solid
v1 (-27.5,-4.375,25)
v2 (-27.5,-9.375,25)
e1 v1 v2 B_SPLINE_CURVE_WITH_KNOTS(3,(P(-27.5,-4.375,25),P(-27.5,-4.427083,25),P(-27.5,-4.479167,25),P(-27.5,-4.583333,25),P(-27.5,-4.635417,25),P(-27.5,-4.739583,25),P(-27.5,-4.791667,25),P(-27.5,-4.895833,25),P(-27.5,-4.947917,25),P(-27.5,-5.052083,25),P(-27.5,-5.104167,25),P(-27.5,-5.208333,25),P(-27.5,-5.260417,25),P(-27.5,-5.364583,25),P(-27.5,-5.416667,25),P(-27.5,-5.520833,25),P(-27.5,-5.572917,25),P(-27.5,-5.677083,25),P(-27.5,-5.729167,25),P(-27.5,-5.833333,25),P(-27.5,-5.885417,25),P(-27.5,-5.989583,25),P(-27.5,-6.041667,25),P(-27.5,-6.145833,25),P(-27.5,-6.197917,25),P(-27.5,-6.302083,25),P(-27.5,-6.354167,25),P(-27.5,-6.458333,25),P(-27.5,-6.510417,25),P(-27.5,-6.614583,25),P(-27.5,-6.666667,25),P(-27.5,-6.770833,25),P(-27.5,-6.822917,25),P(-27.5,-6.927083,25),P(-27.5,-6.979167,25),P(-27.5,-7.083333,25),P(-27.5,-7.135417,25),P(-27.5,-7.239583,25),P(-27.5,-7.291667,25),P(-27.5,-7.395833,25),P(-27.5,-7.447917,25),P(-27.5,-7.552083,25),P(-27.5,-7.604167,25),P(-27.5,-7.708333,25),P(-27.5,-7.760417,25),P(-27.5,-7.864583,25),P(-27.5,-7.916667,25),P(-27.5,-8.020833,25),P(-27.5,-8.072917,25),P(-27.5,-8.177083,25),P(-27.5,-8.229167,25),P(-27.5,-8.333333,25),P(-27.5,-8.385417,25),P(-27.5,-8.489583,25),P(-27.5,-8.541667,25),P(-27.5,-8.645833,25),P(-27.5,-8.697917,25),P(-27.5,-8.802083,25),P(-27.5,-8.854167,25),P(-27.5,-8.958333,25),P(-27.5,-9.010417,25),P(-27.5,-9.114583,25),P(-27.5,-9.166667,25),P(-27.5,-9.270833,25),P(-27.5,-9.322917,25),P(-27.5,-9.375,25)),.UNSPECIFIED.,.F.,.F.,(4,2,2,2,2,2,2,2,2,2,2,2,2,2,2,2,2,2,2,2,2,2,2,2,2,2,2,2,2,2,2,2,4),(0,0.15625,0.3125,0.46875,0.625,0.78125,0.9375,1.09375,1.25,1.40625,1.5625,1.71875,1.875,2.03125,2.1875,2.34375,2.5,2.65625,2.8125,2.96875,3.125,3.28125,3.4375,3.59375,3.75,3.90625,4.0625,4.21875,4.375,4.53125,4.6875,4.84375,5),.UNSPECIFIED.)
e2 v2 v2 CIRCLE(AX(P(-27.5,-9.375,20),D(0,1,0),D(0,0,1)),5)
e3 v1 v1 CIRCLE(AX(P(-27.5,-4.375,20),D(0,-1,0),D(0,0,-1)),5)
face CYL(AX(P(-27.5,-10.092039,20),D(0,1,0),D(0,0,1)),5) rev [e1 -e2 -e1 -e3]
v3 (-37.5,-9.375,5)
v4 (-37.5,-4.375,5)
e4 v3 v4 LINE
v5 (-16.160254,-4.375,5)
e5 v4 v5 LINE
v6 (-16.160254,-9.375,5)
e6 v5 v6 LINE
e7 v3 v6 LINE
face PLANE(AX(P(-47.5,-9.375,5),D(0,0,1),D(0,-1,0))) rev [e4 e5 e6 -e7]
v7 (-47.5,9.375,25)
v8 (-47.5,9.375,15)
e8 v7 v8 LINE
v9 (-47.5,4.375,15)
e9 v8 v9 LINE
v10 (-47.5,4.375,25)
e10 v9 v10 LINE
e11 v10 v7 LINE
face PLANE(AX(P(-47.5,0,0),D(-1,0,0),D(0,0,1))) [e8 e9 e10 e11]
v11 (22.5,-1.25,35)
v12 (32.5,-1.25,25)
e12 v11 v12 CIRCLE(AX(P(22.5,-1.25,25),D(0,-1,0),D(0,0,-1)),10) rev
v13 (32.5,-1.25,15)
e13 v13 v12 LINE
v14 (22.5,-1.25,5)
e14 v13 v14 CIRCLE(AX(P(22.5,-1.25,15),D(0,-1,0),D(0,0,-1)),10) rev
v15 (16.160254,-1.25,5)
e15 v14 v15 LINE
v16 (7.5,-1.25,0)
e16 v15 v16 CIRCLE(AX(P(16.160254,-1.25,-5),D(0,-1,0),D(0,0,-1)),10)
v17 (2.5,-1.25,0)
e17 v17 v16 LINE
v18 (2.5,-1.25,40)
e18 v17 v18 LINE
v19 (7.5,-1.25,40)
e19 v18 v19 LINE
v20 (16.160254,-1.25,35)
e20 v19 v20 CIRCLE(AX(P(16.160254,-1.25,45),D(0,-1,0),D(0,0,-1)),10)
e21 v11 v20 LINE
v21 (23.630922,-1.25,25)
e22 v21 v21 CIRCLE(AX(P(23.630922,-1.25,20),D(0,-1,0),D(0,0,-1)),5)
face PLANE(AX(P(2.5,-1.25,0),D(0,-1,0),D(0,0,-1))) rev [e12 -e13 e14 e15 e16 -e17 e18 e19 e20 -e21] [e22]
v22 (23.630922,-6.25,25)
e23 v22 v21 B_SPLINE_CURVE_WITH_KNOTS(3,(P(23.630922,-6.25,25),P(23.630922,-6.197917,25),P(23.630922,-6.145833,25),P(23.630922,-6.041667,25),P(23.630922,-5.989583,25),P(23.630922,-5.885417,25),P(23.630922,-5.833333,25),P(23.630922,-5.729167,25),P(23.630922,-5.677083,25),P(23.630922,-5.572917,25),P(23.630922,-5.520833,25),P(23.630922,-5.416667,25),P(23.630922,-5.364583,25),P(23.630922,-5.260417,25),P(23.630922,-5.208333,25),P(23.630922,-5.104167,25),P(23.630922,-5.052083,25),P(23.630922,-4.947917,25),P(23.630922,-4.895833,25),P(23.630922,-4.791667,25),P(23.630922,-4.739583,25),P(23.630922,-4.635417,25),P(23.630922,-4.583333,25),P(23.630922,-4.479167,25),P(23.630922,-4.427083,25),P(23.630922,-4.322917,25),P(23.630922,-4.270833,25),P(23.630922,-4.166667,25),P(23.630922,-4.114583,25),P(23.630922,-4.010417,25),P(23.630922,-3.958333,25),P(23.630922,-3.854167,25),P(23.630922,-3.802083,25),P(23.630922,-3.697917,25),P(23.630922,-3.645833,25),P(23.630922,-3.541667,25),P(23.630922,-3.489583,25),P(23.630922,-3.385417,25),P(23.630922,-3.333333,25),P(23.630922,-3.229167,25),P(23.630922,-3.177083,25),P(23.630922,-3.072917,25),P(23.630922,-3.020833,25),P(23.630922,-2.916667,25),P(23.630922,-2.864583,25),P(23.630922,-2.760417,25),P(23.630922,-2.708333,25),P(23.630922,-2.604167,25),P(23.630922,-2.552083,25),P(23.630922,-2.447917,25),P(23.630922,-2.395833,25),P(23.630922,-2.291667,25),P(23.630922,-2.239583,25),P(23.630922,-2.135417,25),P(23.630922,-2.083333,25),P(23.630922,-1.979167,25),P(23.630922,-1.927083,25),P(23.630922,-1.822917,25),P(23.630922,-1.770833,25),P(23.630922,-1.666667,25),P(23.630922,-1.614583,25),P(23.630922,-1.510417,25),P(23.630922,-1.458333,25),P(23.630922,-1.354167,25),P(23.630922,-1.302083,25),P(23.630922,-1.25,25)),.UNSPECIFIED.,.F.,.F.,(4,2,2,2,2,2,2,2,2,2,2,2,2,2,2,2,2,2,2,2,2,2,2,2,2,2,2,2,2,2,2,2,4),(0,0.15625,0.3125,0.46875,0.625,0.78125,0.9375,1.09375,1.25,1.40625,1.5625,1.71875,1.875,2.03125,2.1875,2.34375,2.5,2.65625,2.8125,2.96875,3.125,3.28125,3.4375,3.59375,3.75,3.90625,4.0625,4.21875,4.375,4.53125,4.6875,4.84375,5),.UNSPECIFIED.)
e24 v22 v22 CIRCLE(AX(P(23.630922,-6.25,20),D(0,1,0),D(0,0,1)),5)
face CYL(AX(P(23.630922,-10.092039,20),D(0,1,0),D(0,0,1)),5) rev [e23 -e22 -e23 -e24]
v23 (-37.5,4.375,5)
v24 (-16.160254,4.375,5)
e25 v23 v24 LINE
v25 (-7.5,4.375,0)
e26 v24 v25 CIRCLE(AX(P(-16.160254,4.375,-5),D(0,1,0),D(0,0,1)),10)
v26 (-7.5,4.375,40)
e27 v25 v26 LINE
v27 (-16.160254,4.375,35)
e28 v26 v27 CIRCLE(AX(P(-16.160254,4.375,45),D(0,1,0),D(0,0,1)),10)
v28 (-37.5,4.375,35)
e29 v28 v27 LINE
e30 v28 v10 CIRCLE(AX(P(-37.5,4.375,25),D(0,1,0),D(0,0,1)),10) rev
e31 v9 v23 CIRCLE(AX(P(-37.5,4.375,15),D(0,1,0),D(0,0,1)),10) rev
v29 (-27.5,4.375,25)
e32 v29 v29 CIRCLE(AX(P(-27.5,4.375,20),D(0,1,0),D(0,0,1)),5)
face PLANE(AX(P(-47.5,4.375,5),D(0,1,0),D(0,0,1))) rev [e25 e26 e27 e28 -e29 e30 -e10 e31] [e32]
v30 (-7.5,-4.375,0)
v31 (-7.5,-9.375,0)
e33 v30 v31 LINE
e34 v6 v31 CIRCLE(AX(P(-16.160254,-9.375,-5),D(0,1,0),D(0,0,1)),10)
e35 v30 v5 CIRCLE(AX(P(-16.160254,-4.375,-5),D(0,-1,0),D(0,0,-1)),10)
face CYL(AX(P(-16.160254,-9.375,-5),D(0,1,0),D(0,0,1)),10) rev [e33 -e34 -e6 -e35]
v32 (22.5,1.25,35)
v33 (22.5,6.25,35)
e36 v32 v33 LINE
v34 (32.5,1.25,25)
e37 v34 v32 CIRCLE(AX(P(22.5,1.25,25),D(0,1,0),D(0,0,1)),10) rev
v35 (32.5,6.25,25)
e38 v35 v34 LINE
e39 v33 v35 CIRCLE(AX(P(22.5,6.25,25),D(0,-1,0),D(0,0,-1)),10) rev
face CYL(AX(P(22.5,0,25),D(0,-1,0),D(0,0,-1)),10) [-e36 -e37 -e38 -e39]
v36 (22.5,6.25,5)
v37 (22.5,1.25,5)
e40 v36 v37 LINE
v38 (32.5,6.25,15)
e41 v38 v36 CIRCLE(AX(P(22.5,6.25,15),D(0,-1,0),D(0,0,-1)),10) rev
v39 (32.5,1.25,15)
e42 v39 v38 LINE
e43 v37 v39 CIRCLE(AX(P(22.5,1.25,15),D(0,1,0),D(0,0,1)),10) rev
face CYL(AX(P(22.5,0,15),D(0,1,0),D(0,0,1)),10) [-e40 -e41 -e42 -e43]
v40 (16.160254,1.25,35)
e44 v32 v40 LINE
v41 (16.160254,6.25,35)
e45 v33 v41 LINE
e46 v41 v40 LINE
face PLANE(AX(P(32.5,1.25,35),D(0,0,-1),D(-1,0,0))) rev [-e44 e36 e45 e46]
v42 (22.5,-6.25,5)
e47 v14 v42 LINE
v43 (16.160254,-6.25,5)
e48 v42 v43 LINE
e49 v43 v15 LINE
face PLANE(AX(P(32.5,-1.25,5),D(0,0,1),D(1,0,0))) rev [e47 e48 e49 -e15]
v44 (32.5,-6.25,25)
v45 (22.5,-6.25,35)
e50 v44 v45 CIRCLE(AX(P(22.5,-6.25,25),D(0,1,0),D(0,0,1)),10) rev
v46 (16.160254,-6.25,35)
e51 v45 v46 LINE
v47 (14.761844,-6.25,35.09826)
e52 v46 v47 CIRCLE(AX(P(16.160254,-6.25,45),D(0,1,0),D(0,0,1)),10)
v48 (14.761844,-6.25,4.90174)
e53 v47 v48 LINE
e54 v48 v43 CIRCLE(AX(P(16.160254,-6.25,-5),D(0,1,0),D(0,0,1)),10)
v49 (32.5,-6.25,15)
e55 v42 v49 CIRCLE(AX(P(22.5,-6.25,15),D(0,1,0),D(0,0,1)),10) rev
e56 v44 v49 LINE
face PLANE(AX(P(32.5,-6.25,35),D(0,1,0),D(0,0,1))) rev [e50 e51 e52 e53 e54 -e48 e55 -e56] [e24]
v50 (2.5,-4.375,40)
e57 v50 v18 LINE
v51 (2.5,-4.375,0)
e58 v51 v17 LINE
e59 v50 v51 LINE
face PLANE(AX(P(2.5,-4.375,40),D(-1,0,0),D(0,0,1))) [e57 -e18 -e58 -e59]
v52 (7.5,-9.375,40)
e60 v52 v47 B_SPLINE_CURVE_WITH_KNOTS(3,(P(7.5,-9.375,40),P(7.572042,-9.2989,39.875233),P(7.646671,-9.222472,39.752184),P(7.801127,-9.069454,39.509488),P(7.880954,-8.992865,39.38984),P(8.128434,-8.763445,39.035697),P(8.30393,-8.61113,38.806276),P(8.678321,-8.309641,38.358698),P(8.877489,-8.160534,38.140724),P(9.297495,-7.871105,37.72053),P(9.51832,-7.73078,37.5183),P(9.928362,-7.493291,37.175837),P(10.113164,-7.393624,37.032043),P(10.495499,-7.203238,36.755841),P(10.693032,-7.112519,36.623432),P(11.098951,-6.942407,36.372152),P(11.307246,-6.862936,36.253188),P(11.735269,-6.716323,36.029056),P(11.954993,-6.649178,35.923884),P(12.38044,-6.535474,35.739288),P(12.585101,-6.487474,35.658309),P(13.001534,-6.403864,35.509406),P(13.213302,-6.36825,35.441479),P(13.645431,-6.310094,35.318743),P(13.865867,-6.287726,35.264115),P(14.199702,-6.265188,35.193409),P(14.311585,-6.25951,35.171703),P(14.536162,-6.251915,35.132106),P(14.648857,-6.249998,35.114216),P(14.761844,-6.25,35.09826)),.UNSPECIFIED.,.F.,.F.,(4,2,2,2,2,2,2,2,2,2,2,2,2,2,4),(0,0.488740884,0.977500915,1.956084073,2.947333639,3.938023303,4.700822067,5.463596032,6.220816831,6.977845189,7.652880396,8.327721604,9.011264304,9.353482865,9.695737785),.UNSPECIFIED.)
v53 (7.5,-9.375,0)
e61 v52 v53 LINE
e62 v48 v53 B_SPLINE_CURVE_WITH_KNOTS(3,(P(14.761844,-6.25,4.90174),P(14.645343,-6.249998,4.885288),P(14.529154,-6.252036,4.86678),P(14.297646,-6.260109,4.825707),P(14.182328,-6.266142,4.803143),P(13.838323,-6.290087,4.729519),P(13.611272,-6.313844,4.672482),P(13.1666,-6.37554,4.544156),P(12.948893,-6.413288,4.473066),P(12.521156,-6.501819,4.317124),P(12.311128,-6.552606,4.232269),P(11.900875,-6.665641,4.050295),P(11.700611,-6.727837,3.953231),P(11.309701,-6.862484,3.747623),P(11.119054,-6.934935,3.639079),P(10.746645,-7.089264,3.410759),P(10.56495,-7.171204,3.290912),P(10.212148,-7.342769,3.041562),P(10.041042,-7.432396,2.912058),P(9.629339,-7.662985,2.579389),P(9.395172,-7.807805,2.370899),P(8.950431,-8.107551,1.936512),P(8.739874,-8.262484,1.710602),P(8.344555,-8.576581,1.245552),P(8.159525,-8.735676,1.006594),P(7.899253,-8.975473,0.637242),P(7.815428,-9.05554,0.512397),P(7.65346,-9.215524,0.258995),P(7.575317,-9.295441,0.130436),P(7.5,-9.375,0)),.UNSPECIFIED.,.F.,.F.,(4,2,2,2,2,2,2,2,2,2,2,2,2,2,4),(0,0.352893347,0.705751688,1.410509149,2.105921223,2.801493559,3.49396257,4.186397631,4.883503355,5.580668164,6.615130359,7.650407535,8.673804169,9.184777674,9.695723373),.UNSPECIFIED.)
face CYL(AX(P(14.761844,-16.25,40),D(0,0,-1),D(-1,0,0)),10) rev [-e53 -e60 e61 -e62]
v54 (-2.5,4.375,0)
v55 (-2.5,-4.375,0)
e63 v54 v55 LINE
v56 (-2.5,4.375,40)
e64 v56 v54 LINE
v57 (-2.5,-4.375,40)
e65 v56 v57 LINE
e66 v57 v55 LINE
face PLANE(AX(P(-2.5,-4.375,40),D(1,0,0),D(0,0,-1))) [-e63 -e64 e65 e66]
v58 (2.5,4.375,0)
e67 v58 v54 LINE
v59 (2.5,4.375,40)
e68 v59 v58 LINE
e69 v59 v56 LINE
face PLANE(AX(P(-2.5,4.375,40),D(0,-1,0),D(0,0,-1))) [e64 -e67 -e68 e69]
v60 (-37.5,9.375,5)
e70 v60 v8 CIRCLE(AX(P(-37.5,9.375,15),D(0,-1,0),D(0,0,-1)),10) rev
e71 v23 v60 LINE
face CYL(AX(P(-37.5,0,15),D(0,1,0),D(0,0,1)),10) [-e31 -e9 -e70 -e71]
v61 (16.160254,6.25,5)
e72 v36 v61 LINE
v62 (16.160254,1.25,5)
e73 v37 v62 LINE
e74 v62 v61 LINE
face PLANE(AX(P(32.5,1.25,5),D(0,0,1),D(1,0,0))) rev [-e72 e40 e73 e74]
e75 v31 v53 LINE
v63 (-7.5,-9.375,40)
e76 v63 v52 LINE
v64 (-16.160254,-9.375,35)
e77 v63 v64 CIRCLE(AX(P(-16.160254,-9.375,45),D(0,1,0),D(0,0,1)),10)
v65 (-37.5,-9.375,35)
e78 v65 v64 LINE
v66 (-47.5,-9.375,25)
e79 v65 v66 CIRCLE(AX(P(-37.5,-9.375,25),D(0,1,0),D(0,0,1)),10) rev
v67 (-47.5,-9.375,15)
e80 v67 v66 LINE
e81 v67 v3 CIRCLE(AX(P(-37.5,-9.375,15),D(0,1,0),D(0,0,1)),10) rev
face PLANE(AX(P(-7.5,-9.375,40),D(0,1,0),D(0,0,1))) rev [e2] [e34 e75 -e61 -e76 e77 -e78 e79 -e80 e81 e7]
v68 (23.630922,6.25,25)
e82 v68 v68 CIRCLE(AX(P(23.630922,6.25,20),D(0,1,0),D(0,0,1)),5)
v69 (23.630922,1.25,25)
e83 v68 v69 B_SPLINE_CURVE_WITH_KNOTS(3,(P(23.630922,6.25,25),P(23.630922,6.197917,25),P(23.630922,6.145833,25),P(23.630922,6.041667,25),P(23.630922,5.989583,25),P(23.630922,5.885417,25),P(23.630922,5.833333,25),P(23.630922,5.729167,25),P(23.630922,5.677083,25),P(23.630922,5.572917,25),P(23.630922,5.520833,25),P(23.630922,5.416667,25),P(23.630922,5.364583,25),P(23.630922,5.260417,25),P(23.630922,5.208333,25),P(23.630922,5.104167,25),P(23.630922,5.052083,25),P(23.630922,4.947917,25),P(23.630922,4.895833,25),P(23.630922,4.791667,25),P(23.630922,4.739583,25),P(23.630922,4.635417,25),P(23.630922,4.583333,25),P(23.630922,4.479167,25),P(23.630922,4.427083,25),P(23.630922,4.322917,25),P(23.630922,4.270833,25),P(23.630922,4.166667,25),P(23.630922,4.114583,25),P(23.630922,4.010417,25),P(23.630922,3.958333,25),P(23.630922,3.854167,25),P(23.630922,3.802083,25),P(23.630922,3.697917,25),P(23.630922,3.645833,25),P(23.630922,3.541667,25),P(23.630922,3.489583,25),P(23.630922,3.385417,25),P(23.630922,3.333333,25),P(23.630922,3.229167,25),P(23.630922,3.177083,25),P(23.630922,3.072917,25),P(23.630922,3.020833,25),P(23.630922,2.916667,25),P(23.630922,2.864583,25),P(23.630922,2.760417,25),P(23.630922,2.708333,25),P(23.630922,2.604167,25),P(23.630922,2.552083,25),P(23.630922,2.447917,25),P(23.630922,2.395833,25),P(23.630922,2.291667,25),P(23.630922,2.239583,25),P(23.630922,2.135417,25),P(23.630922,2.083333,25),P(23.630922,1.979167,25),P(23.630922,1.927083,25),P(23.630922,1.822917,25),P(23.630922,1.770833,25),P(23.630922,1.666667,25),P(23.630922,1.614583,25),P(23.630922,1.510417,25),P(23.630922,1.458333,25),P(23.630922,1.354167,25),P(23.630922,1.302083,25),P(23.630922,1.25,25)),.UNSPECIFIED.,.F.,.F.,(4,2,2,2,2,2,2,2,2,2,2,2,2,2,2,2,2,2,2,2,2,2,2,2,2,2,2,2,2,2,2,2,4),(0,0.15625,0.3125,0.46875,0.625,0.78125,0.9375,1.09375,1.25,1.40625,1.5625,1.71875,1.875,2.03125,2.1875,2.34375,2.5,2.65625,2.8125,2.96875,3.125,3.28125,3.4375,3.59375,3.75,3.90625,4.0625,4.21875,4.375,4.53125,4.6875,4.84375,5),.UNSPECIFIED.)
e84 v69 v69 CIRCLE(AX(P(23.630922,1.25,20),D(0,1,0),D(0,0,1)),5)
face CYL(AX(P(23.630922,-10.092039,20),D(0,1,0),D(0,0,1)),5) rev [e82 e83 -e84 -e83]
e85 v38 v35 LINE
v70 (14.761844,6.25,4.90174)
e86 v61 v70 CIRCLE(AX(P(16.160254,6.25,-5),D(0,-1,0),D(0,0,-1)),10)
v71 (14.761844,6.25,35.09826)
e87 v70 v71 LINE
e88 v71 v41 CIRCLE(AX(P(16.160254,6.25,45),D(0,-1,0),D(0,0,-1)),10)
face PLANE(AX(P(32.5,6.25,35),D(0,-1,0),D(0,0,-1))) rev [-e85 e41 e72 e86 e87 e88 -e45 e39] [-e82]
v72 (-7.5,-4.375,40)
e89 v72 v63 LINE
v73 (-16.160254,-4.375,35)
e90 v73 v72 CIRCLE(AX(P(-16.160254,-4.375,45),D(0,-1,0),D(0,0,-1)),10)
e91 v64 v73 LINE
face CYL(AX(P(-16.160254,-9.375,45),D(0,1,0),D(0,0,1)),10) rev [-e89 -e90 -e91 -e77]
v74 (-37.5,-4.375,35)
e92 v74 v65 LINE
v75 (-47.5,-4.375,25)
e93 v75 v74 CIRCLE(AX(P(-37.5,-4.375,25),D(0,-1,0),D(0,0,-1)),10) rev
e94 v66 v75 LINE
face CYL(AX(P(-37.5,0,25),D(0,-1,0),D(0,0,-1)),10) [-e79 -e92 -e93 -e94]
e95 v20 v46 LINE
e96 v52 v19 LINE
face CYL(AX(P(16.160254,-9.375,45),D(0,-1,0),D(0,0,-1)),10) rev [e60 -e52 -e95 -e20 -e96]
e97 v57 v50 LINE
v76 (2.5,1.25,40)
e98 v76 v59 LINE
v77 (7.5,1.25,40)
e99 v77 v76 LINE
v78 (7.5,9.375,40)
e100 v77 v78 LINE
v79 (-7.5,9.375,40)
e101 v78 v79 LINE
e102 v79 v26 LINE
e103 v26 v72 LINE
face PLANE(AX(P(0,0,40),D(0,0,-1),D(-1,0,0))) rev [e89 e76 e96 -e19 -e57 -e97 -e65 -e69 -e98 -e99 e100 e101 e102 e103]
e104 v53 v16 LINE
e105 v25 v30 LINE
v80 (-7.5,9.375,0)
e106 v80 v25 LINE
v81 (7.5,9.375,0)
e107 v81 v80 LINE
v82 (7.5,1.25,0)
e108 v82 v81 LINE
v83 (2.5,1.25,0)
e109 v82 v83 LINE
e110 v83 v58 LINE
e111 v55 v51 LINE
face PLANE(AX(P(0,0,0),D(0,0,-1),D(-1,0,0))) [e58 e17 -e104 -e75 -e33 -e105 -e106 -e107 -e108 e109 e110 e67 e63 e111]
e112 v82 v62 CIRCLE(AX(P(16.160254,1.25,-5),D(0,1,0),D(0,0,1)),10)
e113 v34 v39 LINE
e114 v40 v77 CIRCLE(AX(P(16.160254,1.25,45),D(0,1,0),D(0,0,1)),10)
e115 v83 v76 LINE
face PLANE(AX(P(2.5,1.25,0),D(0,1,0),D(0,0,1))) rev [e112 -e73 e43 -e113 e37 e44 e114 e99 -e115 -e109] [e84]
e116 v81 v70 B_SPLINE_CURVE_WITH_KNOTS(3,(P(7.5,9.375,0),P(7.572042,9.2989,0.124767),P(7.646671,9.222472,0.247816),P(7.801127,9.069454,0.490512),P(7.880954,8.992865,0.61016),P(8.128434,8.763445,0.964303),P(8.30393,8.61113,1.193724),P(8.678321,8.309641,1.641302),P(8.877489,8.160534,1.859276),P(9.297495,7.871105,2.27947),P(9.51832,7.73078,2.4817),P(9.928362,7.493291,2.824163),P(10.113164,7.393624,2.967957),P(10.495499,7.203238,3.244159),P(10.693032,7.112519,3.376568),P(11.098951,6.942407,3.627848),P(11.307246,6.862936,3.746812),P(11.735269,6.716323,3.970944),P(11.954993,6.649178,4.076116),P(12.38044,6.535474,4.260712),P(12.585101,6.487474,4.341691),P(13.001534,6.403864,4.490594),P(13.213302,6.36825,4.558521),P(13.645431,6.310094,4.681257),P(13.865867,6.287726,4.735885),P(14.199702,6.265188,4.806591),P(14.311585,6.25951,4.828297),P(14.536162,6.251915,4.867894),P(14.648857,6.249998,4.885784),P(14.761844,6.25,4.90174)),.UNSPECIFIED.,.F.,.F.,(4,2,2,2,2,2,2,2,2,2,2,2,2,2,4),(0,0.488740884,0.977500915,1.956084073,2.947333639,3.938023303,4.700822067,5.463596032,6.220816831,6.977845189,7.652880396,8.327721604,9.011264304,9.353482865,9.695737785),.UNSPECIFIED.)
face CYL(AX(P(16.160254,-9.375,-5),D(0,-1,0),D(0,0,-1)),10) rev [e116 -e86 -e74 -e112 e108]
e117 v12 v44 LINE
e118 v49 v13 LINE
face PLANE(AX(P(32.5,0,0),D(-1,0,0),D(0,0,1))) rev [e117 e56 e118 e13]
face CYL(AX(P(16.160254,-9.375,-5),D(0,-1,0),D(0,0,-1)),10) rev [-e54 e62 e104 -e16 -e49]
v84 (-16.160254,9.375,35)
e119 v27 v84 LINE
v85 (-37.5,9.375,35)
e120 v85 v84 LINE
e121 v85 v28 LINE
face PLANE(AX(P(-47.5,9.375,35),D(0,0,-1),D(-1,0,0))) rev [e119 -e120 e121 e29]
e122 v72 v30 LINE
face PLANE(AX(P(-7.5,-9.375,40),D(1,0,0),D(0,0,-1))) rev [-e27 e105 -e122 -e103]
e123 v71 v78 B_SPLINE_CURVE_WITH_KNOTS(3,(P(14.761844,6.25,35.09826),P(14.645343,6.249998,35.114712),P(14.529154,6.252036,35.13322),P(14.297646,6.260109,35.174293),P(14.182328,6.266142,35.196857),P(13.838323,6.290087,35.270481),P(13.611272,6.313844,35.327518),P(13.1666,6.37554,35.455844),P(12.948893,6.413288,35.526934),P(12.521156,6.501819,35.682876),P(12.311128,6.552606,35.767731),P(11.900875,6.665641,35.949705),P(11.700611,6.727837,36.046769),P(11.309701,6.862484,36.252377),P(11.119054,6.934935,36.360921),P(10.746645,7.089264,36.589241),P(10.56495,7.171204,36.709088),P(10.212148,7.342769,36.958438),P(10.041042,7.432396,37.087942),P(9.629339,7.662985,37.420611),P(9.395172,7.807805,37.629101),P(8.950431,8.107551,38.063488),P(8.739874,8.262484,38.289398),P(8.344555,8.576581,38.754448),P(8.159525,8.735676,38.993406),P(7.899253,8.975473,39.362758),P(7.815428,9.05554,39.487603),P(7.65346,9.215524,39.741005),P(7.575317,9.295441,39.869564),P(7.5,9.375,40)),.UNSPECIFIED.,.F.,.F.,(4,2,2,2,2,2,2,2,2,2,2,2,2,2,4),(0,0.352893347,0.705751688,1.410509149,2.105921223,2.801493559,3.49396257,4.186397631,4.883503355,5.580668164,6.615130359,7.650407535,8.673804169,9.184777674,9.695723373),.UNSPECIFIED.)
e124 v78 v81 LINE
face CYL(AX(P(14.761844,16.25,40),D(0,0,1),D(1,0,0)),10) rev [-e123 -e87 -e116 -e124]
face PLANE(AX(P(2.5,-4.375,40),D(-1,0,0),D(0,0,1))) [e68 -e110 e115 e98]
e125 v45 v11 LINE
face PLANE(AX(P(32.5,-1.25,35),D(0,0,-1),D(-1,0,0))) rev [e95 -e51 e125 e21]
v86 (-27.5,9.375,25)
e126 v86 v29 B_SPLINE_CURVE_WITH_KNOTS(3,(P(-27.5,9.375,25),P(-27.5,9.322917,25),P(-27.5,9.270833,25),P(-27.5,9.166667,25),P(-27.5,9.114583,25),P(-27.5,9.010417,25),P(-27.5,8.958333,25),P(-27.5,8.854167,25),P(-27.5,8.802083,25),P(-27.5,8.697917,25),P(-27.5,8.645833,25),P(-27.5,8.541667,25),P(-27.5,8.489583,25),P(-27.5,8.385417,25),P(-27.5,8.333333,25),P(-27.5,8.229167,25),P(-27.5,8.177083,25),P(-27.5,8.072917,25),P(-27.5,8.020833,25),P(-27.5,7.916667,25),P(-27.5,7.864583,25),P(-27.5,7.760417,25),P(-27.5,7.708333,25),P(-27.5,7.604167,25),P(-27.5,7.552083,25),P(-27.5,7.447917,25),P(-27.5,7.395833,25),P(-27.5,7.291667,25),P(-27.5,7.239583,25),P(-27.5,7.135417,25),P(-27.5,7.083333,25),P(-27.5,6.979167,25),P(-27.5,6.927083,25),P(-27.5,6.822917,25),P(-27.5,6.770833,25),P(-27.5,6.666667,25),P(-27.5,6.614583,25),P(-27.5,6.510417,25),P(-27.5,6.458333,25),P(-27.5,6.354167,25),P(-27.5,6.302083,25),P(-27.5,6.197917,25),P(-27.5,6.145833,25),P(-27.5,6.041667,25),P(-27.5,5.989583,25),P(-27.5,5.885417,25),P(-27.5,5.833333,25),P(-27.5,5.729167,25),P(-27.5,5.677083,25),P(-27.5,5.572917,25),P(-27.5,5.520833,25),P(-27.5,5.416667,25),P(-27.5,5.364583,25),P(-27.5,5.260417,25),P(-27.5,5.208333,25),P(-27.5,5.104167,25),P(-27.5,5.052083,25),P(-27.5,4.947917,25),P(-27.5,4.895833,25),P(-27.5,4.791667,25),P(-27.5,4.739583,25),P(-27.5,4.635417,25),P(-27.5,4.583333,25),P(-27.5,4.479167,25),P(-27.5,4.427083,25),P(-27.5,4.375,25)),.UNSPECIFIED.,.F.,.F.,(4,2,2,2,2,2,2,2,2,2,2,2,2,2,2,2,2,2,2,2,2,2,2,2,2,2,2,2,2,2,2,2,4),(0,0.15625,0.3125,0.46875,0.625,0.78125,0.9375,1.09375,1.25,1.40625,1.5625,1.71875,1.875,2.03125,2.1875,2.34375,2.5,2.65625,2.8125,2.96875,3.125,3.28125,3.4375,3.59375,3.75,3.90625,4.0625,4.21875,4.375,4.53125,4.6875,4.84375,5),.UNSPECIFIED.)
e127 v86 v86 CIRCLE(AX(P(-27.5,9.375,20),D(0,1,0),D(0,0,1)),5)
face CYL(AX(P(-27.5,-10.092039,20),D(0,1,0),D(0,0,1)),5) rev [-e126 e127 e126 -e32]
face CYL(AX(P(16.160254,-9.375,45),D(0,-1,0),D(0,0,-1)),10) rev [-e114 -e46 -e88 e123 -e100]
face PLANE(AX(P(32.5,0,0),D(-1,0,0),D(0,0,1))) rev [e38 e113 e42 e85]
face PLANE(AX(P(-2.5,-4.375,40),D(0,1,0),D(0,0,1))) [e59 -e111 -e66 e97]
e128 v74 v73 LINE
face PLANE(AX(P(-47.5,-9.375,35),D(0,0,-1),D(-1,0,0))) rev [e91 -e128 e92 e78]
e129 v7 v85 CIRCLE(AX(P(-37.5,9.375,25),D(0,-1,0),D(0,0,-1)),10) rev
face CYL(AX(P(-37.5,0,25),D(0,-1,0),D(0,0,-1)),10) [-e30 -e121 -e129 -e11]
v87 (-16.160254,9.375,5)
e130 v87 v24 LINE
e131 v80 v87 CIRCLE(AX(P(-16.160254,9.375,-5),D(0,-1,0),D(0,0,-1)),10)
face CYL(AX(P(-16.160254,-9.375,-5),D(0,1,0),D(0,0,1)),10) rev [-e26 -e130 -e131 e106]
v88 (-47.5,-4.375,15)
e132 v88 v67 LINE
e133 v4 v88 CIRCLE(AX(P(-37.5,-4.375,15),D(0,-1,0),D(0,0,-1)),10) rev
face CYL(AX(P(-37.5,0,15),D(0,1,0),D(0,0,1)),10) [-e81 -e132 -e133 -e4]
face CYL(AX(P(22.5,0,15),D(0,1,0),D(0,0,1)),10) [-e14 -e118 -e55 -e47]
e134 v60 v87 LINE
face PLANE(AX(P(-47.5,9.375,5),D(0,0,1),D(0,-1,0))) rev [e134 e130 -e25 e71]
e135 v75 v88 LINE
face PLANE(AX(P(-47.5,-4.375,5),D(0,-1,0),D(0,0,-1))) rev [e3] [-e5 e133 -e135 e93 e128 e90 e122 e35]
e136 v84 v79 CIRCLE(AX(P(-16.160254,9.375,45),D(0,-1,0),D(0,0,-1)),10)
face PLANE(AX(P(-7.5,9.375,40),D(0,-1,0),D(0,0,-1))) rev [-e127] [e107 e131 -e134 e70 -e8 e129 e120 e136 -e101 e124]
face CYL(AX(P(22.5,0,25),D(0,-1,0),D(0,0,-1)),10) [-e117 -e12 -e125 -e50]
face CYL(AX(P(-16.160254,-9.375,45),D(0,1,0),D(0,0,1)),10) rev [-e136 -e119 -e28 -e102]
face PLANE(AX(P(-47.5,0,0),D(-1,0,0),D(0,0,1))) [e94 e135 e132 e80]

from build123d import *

# Parameters (mm, degrees)
SCHIZZO1_W                    = 15
SCHIZZO1_H                    = 18.75
SCHIZZO1_W_2                  = 5
SCHIZZO1_H_2                  = 8.75
ESTRUSIONE_ESTRUSIONE1_DEPTH  = 40
TAGLIO_ESTRUSIONE1_DEPTH      = 42.762909681
TAGLIO_ESTRUSIONE1_DEPTH_BACK = 42.762909681
SCHIZZO2_W                    = 5
SCHIZZO2_H                    = 2.5
SCHIZZO4_W                    = 30
SCHIZZO4_H                    = 5
ESTRUSIONE_ESTRUSIONE2_DEPTH  = 40
RACCORDO1_R                   = 10
SCHIZZO5_W                    = 30
SCHIZZO5_H                    = 5
ESTRUSIONE_ESTRUSIONE3_DEPTH  = 25
RACCORDO2_R                   = 10
RACCORDO3_R                   = 10
RACCORDO4_R                   = 10
RACCORDO5_R                   = 10
TAGLIO_ESTRUSIONE2_DEPTH      = 65.034292657
TAGLIO_ESTRUSIONE2_DEPTH_BACK = 65.034292657
SCHIZZO6_R                    = 5
TAGLIO_ESTRUSIONE3_DEPTH      = 65.867653817
TAGLIO_ESTRUSIONE3_DEPTH_BACK = 65.867653817
SCHIZZO7_R                    = 5


with BuildPart() as part:
    # Schizzo1 → Estrusione-Estrusione1 (new body)
    with BuildSketch(Plane.XY):
        Rectangle(SCHIZZO1_W, SCHIZZO1_H)
        Rectangle(SCHIZZO1_W_2, SCHIZZO1_H_2, mode=Mode.SUBTRACT)
    extrude(amount=ESTRUSIONE_ESTRUSIONE1_DEPTH)

    # Schizzo2 → Taglio-Estrusione1 (cut, two sides: drawn at the far end of the back side and taken through both)
    with BuildSketch(Plane.XY.offset(40).offset(-TAGLIO_ESTRUSIONE1_DEPTH_BACK)):
        with Locations((5, 0)):
            Rectangle(SCHIZZO2_W, SCHIZZO2_H)
    extrude(amount=TAGLIO_ESTRUSIONE1_DEPTH + TAGLIO_ESTRUSIONE1_DEPTH_BACK, mode=Mode.SUBTRACT)

    # Schizzo4 → Estrusione-Estrusione2 (add)
    with BuildSketch(Plane.ZY.offset(7.5)):
        with Locations((20, 6.875)):
            Rectangle(SCHIZZO4_W, SCHIZZO4_H)
        with Locations((20, -6.875)):
            Rectangle(SCHIZZO4_W, SCHIZZO4_H)
    extrude(amount=ESTRUSIONE_ESTRUSIONE2_DEPTH)

    # Raccordo1
    raccordo1_edges = [part.edges().sort_by_distance(p)[0] for p in [
        (-47.5, 6.875, 5),
        (-47.5, 6.875, 35),
        (-47.5, -6.875, 35),
        (-47.5, -6.875, 5),
    ]]
    fillet(raccordo1_edges, radius=RACCORDO1_R)

    # Schizzo5 → Estrusione-Estrusione3 (add)
    with BuildSketch(Plane(origin=(7.5, 0, 0), x_dir=(0, 0, -1), z_dir=(1, 0, 0))):
        with Locations((-20, 3.75)):
            Rectangle(SCHIZZO5_W, SCHIZZO5_H)
        with Locations((-20, -3.75)):
            Rectangle(SCHIZZO5_W, SCHIZZO5_H)
    extrude(amount=ESTRUSIONE_ESTRUSIONE3_DEPTH)

    # Raccordo2
    raccordo2_edges = [part.edges().sort_by_distance(p)[0] for p in [
        (32.5, 3.75, 35),
        (32.5, 3.75, 5),
        (32.5, -3.75, 35),
        (32.5, -3.75, 5),
    ]]
    fillet(raccordo2_edges, radius=RACCORDO2_R)

    # Raccordo3
    # the kernel refuses this fillet: 10 mm, written as the material it adds along each edge
    with BuildSketch(Plane(origin=(7.5, -6.25, 5), x_dir=(0, 0, -1), z_dir=(0, 1, 0)), Plane(origin=(7.5, 1.25, 5), x_dir=(0, 0, -1), z_dir=(0, 1, 0)), Plane(origin=(7.5, 6.25, 35), x_dir=(0, 0, 1), z_dir=(0, -1, 0))) as raccordo3_piece_1:
        with BuildLine():
            CenterArc((10, -8.660254038), RACCORDO3_R, 120, 60)
            Line((0, -8.660254038), (-0.2, -8.660254038))
            Line((-0.2, -8.660254038), (-0.2, 0))
            Line((-0.2, 0), (0, 0.2))
            ThreePointArc((0, 0.2), (2.5, 0.2), (4.9, 0.173205081))
            Line((4.9, 0.173205081), (5, 0))
        make_face()
    extrude(amount=5)
    with BuildSketch(Plane(origin=(7.5, -6.25, 5), x_dir=(0, 0, -1), z_dir=(0, 1, 0))) as raccordo3_piece_2_section:
        with BuildLine():
            CenterArc((10, -8.660254038), RACCORDO3_R, 120, 60)
            Line((0, -8.660254038), (-0.2, -8.660254038))
            Line((-0.2, -8.660254038), (-0.2, 0))
            Line((-0.2, 0), (0, 0.2))
            ThreePointArc((0, 0.2), (2.5, 0.2), (4.9, 0.173205081))
            Line((4.9, 0.173205081), (5, 0))
        make_face()
    raccordo3_piece_2 = extrude(amount=26.650635095, mode=Mode.PRIVATE)
    raccordo3_piece_2 = split(raccordo3_piece_2, bisect_by=Plane(origin=(9.663104458, 1.25, 3.704832889), z_dir=(0, 1, 0)), keep=Keep.TOP, mode=Mode.PRIVATE)
    raccordo3_piece_2 = split(raccordo3_piece_2, bisect_by=Plane(origin=(9.663104458, 6.25, 3.704832889), z_dir=(0, -1, 0)), keep=Keep.TOP, mode=Mode.PRIVATE)
    add(raccordo3_piece_2)
    with BuildSketch(Plane(origin=(7.5, -20.400635095, 5), x_dir=(0, 0, -1), z_dir=(0, 1, 0))) as raccordo3_piece_3_section:
        with BuildLine():
            CenterArc((10, -8.660254038), RACCORDO3_R, 120, 60)
            Line((0, -8.660254038), (-0.2, -8.660254038))
            Line((-0.2, -8.660254038), (-0.2, 0))
            Line((-0.2, 0), (0, 0.2))
            ThreePointArc((0, 0.2), (2.5, 0.2), (4.9, 0.173205081))
            Line((4.9, 0.173205081), (5, 0))
        make_face()
    raccordo3_piece_3 = extrude(amount=26.650635095, mode=Mode.PRIVATE)
    raccordo3_piece_3 = split(raccordo3_piece_3, bisect_by=Plane(origin=(9.663104458, -1.25, 3.704832889), z_dir=(0, -1, 0)), keep=Keep.TOP, mode=Mode.PRIVATE)
    raccordo3_piece_3 = split(raccordo3_piece_3, bisect_by=Plane(origin=(9.663104458, -6.25, 3.704832889), z_dir=(0, 1, 0)), keep=Keep.TOP, mode=Mode.PRIVATE)
    add(raccordo3_piece_3)
    with BuildSketch(Plane(origin=(7.5, 20.400635095, 35), x_dir=(1, 0, 0), z_dir=(0, -1, 0))) as raccordo3_piece_4_section:
        with BuildLine():
            CenterArc((8.660254038, 10), RACCORDO3_R, 210, 60)
            Line((0, 5), (-0.173205081, 4.9))
            ThreePointArc((-0.173205081, 4.9), (-0.2, 2.5), (-0.2, 0))
            Line((-0.2, 0), (0, -0.2))
            Line((0, -0.2), (8.660254038, -0.2))
            Line((8.660254038, -0.2), (8.660254038, 0))
        make_face()
    raccordo3_piece_4 = extrude(amount=26.650635095, mode=Mode.PRIVATE)
    raccordo3_piece_4 = split(raccordo3_piece_4, bisect_by=Plane(origin=(9.663104458, 1.25, 36.295167111), z_dir=(0, 1, 0)), keep=Keep.TOP, mode=Mode.PRIVATE)
    raccordo3_piece_4 = split(raccordo3_piece_4, bisect_by=Plane(origin=(9.663104458, 6.25, 36.295167111), z_dir=(0, -1, 0)), keep=Keep.TOP, mode=Mode.PRIVATE)
    add(raccordo3_piece_4)
    with BuildSketch(Plane(origin=(7.5, -1.25, 35), x_dir=(1, 0, 0), z_dir=(0, -1, 0))) as raccordo3_piece_5:
        with BuildLine():
            CenterArc((8.660254038, 10), RACCORDO3_R, 210, 60)
            Line((0, 5), (-0.173205081, 4.9))
            ThreePointArc((-0.173205081, 4.9), (-0.2, 2.5), (-0.2, 0))
            Line((-0.2, 0), (0, -0.2))
            Line((0, -0.2), (8.660254038, -0.2))
            Line((8.660254038, -0.2), (8.660254038, 0))
        make_face()
    extrude(amount=5)
    with BuildSketch(Plane(origin=(7.5, 6.25, 35), x_dir=(0, 0, 1), z_dir=(0, -1, 0))) as raccordo3_piece_6_section:
        with BuildLine():
            CenterArc((10, -8.660254038), RACCORDO3_R, 120, 60)
            Line((0, -8.660254038), (-0.2, -8.660254038))
            Line((-0.2, -8.660254038), (-0.2, 0))
            Line((-0.2, 0), (0, 0.2))
            ThreePointArc((0, 0.2), (2.5, 0.2), (4.9, 0.173205081))
            Line((4.9, 0.173205081), (5, 0))
        make_face()
    raccordo3_piece_6 = extrude(amount=26.650635095, mode=Mode.PRIVATE)
    raccordo3_piece_6 = split(raccordo3_piece_6, bisect_by=Plane(origin=(9.663104458, -1.25, 36.295167111), z_dir=(0, -1, 0)), keep=Keep.TOP, mode=Mode.PRIVATE)
    raccordo3_piece_6 = split(raccordo3_piece_6, bisect_by=Plane(origin=(9.663104458, -6.25, 36.295167111), z_dir=(0, 1, 0)), keep=Keep.TOP, mode=Mode.PRIVATE)
    add(raccordo3_piece_6)

    # Raccordo4
    # the kernel refuses this fillet: 10 mm, written as the material it adds along each edge
    with BuildSketch(Plane(origin=(7.5, 6.25, 0), x_dir=(1, 0, 0), z_dir=(0, 0, 1))) as raccordo4_piece_1_section:
        with BuildLine():
            CenterArc((7.261843774, 10), RACCORDO4_R, 223.432536558, 46.567463442)
            Line((0, 3.125), (-0.145236875, 2.9875))
            ThreePointArc((-0.145236875, 2.9875), (-0.2, 1.5625), (-0.2, 0))
            Line((-0.2, 0), (0, -0.2))
            Line((0, -0.2), (7.261843774, -0.2))
            Line((7.261843774, -0.2), (7.261843774, 0))
        make_face()
    raccordo4_piece_1 = extrude(amount=40, mode=Mode.PRIVATE)
    raccordo4_piece_1 = raccordo4_piece_1 - Plane(origin=(16.160254038, 7.063958932, -5), x_dir=(0, 0, -1), z_dir=(0, -1, 0)) * Cylinder(10, 110, mode=Mode.PRIVATE)
    raccordo4_piece_1 = raccordo4_piece_1 - Plane(origin=(16.160254038, 7.063958932, 45), x_dir=(0, 0, 1), z_dir=(0, 1, 0)) * Cylinder(10, 110, mode=Mode.PRIVATE)
    add(raccordo4_piece_1)
    with BuildSketch(Plane(origin=(7.5, -6.25, 40), x_dir=(1, 0, 0), z_dir=(0, 0, -1))) as raccordo4_piece_2_section:
        with BuildLine():
            CenterArc((7.261843774, 10), RACCORDO4_R, 223.432536558, 46.567463442)
            Line((0, 3.125), (-0.145236875, 2.9875))
            ThreePointArc((-0.145236875, 2.9875), (-0.2, 1.5625), (-0.2, 0))
            Line((-0.2, 0), (0, -0.2))
            Line((0, -0.2), (7.261843774, -0.2))
            Line((7.261843774, -0.2), (7.261843774, 0))
        make_face()
    raccordo4_piece_2 = extrude(amount=40, mode=Mode.PRIVATE)
    raccordo4_piece_2 = raccordo4_piece_2 - Plane(origin=(16.160254038, -7.063958932, 45), x_dir=(1, 0, 0), z_dir=(0, 1, 0)) * Cylinder(10, 110, mode=Mode.PRIVATE)
    raccordo4_piece_2 = raccordo4_piece_2 - Plane(origin=(16.160254038, -7.063958932, -5), x_dir=(0, 0, -1), z_dir=(0, -1, 0)) * Cylinder(10, 110, mode=Mode.PRIVATE)
    add(raccordo4_piece_2)

    # Raccordo5
    # the kernel refuses this fillet: 10 mm, written as the material it adds along each edge
    with BuildSketch(Plane(origin=(-7.5, 9.375, 35), x_dir=(-1, 0, 0), z_dir=(0, -1, 0))) as raccordo5_piece_1:
        with BuildLine():
            CenterArc((8.660254038, -10), RACCORDO5_R, 90, 60)
            Line((0, -5), (-0.173205081, -4.9))
            ThreePointArc((-0.173205081, -4.9), (-0.2, -2.5), (-0.2, 0))
            Line((-0.2, 0), (0, 0.2))
            Line((0, 0.2), (8.660254038, 0.2))
            Line((8.660254038, 0.2), (8.660254038, 0))
        make_face()
    extrude(amount=5)
    with BuildSketch(Plane(origin=(-7.5, 9.375, 35), x_dir=(-1, 0, 0), z_dir=(0, -1, 0))) as raccordo5_piece_2_section:
        with BuildLine():
            CenterArc((8.660254038, -10), RACCORDO5_R, 90, 60)
            Line((0, -5), (-0.173205081, -4.9))
            ThreePointArc((-0.173205081, -4.9), (-0.2, -2.5), (-0.2, 0))
            Line((-0.2, 0), (0, 0.2))
            Line((0, 0.2), (8.660254038, 0.2))
            Line((8.660254038, 0.2), (8.660254038, 0))
        make_face()
    raccordo5_piece_2 = extrude(amount=26.650635095, mode=Mode.PRIVATE)
    raccordo5_piece_2 = split(raccordo5_piece_2, bisect_by=Plane(origin=(-9.663104458, -9.375, 36.295167111), z_dir=(0, 1, 0)), keep=Keep.TOP, mode=Mode.PRIVATE)
    raccordo5_piece_2 = split(raccordo5_piece_2, bisect_by=Plane(origin=(-9.663104458, -4.375, 36.295167111), z_dir=(0, -1, 0)), keep=Keep.TOP, mode=Mode.PRIVATE)
    add(raccordo5_piece_2)
    with BuildSketch(Plane(origin=(-7.5, -17.275635095, 5), x_dir=(0, 0, -1), z_dir=(0, 1, 0))) as raccordo5_piece_3_section:
        with BuildLine():
            CenterArc((10, 8.660254038), RACCORDO5_R, 180, 60)
            Line((0, 8.660254038), (-0.2, 8.660254038))
            Line((-0.2, 8.660254038), (-0.2, 0))
            Line((-0.2, 0), (0, -0.2))
            ThreePointArc((0, -0.2), (2.5, -0.2), (4.9, -0.173205081))
            Line((4.9, -0.173205081), (5, 0))
        make_face()
    raccordo5_piece_3 = extrude(amount=26.650635095, mode=Mode.PRIVATE)
    raccordo5_piece_3 = split(raccordo5_piece_3, bisect_by=Plane(origin=(-9.663104458, -9.375, 3.704832889), z_dir=(0, 1, 0)), keep=Keep.TOP, mode=Mode.PRIVATE)
    raccordo5_piece_3 = split(raccordo5_piece_3, bisect_by=Plane(origin=(-9.663104458, -4.375, 3.704832889), z_dir=(0, -1, 0)), keep=Keep.TOP, mode=Mode.PRIVATE)
    add(raccordo5_piece_3)
    with BuildSketch(Plane(origin=(-7.5, 4.375, 5), x_dir=(0, 0, -1), z_dir=(0, 1, 0))) as raccordo5_piece_4:
        with BuildLine():
            CenterArc((10, 8.660254038), RACCORDO5_R, 180, 60)
            Line((0, 8.660254038), (-0.2, 8.660254038))
            Line((-0.2, 8.660254038), (-0.2, 0))
            Line((-0.2, 0), (0, -0.2))
            ThreePointArc((0, -0.2), (2.5, -0.2), (4.9, -0.173205081))
            Line((4.9, -0.173205081), (5, 0))
        make_face()
    extrude(amount=5)
    with BuildSketch(Plane(origin=(-7.5, 17.275635095, 5), x_dir=(0, 0, -1), z_dir=(0, -1, 0))) as raccordo5_piece_5_section:
        with BuildLine():
            CenterArc((10, -8.660254038), RACCORDO5_R, 120, 60)
            Line((0, -8.660254038), (-0.2, -8.660254038))
            Line((-0.2, -8.660254038), (-0.2, 0))
            Line((-0.2, 0), (0, 0.2))
            ThreePointArc((0, 0.2), (2.5, 0.2), (4.9, 0.173205081))
            Line((4.9, 0.173205081), (5, 0))
        make_face()
    raccordo5_piece_5 = extrude(amount=26.650635095, mode=Mode.PRIVATE)
    raccordo5_piece_5 = split(raccordo5_piece_5, bisect_by=Plane(origin=(-9.663104458, 9.375, 3.704832889), z_dir=(0, -1, 0)), keep=Keep.TOP, mode=Mode.PRIVATE)
    raccordo5_piece_5 = split(raccordo5_piece_5, bisect_by=Plane(origin=(-9.663104458, 4.375, 3.704832889), z_dir=(0, 1, 0)), keep=Keep.TOP, mode=Mode.PRIVATE)
    add(raccordo5_piece_5)
    with BuildSketch(Plane(origin=(-7.5, -4.375, 5), x_dir=(0, 0, -1), z_dir=(0, -1, 0)), Plane(origin=(-7.5, -9.375, 35), x_dir=(0, 0, 1), z_dir=(0, 1, 0))) as raccordo5_piece_6:
        with BuildLine():
            CenterArc((10, -8.660254038), RACCORDO5_R, 120, 60)
            Line((0, -8.660254038), (-0.2, -8.660254038))
            Line((-0.2, -8.660254038), (-0.2, 0))
            Line((-0.2, 0), (0, 0.2))
            ThreePointArc((0, 0.2), (2.5, 0.2), (4.9, 0.173205081))
            Line((4.9, 0.173205081), (5, 0))
        make_face()
    extrude(amount=5)
    with BuildSketch(Plane(origin=(-7.5, -9.375, 35), x_dir=(0, 0, 1), z_dir=(0, 1, 0))) as raccordo5_piece_7_section:
        with BuildLine():
            CenterArc((10, -8.660254038), RACCORDO5_R, 120, 60)
            Line((0, -8.660254038), (-0.2, -8.660254038))
            Line((-0.2, -8.660254038), (-0.2, 0))
            Line((-0.2, 0), (0, 0.2))
            ThreePointArc((0, 0.2), (2.5, 0.2), (4.9, 0.173205081))
            Line((4.9, 0.173205081), (5, 0))
        make_face()
    raccordo5_piece_7 = extrude(amount=26.650635095, mode=Mode.PRIVATE)
    raccordo5_piece_7 = split(raccordo5_piece_7, bisect_by=Plane(origin=(-9.663104458, 9.375, 36.295167111), z_dir=(0, -1, 0)), keep=Keep.TOP, mode=Mode.PRIVATE)
    raccordo5_piece_7 = split(raccordo5_piece_7, bisect_by=Plane(origin=(-9.663104458, 4.375, 36.295167111), z_dir=(0, 1, 0)), keep=Keep.TOP, mode=Mode.PRIVATE)
    add(raccordo5_piece_7)

    # Schizzo6 → Taglio-Estrusione2 (cut, two sides: drawn at the far end of the back side and taken through both)
    with BuildSketch(Plane(origin=(0, 6.25, 0), x_dir=(1, 0, 0), z_dir=(0, 1, 0)).offset(-TAGLIO_ESTRUSIONE2_DEPTH_BACK)):
        with Locations(Location((23.630921887, -20, 0), (0, 0, 270))):
            Circle(SCHIZZO6_R)
    extrude(amount=TAGLIO_ESTRUSIONE2_DEPTH + TAGLIO_ESTRUSIONE2_DEPTH_BACK, mode=Mode.SUBTRACT)

    # Schizzo7 → Taglio-Estrusione3 (cut, two sides: drawn at the far end of the back side and taken through both)
    with BuildSketch(Plane(origin=(0, 9.375, 0), x_dir=(1, 0, 0), z_dir=(0, 1, 0)).offset(-TAGLIO_ESTRUSIONE3_DEPTH_BACK)):
        with Locations(Location((-27.5, -20, 0), (0, 0, 270))):
            Circle(SCHIZZO7_R)
    extrude(amount=TAGLIO_ESTRUSIONE3_DEPTH + TAGLIO_ESTRUSIONE3_DEPTH_BACK, mode=Mode.SUBTRACT)


solid = part.part
